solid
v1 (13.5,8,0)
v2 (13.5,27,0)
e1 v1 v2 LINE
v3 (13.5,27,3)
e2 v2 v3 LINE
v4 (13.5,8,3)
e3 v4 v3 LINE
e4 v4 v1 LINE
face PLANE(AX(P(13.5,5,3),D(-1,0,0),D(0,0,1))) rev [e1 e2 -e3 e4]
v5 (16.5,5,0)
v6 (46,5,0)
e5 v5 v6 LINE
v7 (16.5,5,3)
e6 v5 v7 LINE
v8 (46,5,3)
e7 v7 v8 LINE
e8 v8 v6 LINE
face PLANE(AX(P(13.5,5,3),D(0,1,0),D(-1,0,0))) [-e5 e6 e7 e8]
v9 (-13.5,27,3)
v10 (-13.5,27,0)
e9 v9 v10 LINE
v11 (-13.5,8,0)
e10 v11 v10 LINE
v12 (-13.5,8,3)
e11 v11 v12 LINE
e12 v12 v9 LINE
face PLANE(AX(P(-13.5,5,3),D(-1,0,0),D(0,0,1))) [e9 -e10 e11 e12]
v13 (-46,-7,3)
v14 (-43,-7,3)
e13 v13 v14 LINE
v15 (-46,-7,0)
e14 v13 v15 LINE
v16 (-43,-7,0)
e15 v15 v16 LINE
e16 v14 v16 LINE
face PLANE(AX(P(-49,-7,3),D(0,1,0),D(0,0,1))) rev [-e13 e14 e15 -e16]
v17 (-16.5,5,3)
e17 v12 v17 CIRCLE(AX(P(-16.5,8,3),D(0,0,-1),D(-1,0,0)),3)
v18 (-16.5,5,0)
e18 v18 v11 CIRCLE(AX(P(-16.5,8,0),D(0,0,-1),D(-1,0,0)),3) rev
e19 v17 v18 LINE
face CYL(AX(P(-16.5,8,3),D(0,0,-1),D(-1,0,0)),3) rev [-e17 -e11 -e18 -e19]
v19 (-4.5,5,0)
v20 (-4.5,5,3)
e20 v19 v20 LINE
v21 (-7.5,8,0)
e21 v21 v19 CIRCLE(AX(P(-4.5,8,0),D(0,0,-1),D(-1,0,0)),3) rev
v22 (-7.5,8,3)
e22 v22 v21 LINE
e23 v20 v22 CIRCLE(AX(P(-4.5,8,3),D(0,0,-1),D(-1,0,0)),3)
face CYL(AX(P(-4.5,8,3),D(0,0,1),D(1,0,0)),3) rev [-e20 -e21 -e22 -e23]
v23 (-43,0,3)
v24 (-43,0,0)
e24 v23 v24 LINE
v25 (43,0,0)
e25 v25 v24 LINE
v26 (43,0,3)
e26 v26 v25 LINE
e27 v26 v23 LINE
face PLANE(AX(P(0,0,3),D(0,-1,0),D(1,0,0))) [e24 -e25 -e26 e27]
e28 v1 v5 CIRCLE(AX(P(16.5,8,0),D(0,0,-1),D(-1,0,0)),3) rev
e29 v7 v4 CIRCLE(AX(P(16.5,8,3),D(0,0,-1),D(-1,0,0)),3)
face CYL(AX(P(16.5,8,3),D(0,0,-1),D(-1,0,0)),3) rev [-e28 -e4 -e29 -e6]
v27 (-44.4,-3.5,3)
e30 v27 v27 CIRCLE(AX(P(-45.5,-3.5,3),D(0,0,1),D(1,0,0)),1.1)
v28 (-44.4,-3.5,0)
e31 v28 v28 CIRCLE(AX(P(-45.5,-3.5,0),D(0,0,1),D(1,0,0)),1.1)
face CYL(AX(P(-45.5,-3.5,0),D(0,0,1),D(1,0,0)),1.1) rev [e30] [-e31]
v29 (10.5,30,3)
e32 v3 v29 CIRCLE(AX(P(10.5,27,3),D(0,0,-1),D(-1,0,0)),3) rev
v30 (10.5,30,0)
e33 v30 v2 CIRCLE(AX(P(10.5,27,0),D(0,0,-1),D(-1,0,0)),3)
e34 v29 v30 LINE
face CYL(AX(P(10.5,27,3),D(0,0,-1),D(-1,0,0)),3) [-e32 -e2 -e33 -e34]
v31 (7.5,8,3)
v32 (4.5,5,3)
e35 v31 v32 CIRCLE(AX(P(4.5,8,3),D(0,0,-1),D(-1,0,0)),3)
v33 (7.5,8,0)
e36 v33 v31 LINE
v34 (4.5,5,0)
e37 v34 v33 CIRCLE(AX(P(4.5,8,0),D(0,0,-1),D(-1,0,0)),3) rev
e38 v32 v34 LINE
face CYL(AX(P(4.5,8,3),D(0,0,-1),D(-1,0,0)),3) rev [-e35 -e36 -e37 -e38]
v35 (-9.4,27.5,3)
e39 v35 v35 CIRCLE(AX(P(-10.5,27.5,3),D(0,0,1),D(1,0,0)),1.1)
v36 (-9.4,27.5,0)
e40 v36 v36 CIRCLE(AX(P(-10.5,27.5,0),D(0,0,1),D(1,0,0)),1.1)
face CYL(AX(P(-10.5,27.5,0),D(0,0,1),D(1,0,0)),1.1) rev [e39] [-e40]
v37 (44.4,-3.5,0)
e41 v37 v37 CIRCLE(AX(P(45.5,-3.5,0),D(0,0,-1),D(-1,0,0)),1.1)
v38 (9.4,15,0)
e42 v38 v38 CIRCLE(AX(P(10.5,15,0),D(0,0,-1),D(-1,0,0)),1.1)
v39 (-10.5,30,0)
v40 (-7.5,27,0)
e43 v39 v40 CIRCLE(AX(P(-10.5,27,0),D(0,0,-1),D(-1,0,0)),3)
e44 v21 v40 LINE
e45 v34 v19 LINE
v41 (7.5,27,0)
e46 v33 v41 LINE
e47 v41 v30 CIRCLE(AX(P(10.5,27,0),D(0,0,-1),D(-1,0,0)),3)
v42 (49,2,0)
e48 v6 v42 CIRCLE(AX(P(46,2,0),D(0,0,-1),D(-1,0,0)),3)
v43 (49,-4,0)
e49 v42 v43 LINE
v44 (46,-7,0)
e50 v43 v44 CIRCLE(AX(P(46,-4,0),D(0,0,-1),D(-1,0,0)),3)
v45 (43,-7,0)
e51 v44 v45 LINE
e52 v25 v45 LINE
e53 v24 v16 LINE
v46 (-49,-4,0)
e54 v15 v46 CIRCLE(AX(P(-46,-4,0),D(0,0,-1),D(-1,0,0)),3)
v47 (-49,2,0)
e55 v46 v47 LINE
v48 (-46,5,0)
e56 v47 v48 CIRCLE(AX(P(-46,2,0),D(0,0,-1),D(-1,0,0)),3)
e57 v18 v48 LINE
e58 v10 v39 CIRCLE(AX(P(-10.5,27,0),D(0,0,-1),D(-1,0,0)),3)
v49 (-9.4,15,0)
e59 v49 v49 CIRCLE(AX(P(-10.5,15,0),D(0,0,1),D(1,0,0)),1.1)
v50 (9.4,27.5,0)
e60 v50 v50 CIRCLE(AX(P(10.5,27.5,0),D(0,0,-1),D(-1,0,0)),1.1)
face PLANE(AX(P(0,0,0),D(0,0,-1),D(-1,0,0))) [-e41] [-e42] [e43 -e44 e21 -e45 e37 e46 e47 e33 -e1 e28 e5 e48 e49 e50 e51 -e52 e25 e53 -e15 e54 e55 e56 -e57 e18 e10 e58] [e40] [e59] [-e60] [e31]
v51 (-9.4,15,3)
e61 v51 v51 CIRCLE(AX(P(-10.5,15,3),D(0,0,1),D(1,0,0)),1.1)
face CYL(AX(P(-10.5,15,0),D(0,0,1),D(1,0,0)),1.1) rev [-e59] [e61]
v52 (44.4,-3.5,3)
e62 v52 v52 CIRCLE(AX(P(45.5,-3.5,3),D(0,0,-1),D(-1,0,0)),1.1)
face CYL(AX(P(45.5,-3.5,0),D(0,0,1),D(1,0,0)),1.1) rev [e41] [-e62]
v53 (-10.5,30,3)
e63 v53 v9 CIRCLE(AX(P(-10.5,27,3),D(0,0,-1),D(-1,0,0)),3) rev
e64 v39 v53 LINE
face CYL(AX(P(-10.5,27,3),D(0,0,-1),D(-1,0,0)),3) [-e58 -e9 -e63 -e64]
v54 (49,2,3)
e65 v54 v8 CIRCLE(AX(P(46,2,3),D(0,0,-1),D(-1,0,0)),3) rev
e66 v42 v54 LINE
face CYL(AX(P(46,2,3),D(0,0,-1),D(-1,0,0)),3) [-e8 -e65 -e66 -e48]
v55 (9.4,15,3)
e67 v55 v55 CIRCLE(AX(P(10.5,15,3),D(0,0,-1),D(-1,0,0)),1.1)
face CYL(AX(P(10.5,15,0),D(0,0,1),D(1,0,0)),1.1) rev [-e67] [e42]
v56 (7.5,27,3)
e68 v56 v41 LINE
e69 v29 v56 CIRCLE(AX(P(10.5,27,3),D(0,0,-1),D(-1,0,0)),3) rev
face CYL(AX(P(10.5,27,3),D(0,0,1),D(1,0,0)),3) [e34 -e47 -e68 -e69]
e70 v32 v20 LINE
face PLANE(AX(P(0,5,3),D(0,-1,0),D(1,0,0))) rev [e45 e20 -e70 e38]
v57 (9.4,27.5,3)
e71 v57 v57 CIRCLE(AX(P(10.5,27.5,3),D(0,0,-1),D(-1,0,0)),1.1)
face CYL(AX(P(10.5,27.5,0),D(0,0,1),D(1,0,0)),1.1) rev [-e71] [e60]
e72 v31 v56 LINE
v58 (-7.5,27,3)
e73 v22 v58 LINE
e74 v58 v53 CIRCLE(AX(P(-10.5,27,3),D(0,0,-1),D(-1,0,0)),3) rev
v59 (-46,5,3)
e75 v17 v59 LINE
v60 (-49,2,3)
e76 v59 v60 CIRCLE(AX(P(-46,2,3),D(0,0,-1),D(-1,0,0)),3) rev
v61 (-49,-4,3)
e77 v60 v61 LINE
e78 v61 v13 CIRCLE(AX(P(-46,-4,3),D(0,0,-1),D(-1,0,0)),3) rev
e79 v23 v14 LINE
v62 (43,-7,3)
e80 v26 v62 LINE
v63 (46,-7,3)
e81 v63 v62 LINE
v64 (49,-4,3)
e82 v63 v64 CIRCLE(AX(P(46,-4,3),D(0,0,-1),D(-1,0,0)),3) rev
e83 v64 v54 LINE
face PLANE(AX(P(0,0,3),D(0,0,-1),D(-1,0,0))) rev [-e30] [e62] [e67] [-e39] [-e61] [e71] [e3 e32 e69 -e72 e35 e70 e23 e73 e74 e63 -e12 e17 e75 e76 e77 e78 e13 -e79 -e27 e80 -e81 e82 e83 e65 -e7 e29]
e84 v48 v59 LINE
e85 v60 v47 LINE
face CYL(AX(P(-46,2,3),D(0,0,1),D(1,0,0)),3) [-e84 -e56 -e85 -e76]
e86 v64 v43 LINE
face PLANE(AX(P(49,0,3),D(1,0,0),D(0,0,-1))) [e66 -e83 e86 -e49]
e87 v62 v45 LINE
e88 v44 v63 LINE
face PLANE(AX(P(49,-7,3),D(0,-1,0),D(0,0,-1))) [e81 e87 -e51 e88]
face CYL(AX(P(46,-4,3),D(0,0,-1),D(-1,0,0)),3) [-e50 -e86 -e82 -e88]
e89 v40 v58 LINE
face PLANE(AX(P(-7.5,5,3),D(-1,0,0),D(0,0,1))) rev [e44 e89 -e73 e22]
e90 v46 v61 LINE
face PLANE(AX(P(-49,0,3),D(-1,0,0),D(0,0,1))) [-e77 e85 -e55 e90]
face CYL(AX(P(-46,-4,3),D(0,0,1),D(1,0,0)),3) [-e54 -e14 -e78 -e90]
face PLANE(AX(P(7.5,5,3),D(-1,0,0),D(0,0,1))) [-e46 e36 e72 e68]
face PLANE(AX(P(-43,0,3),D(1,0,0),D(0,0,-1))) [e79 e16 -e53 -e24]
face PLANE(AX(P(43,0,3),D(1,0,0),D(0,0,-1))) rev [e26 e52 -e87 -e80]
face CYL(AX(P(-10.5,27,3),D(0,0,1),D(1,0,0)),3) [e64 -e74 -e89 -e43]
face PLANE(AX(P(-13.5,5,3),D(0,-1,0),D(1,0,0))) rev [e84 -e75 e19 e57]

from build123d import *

# Parameters (mm, degrees)
BOSS_EXTRU_1_DEPTH      = 3
ESQUISSE2_R             = 1.1
ENL_V_MAT_EXTRU_1_DEPTH = 3
ESQUISSE3_R             = 1.1
ENL_V_MAT_EXTRU_2_DEPTH = 3
CONG_1_R                = 3
CONG_1_OF_SYM_TRIE1_R   = 3


with BuildPart() as part:
    # Esquisse1 → Boss.-Extru.1 (new body)
    with BuildSketch(Plane.XY):
        Polygon((-13.5, 5), (-49, 5), (-49, 0), (-49, -7), (-43, -7), (-43, 0), (0, 0), (0, 5), (-7.5, 5), (-7.5, 30), (-13.5, 30), align=None)
    boss_extru_1 = extrude(amount=BOSS_EXTRU_1_DEPTH)

    # Esquisse2 → Enlèv. mat.-Extru.1 (cut)
    with BuildSketch(Plane.XY.offset(3)):
        with Locations((-45.5, -3.5)):
            Circle(ESQUISSE2_R)
    enl_v_mat_extru_1 = extrude(amount=-ENL_V_MAT_EXTRU_1_DEPTH, mode=Mode.SUBTRACT)

    # Esquisse3 → Enlèv. mat.-Extru.2 (cut)
    with BuildSketch(Plane.XY.offset(3)):
        with Locations((-10.5, 15)):
            Circle(ESQUISSE3_R)
        with Locations((-10.5, 27.5)):
            Circle(ESQUISSE3_R)
    enl_v_mat_extru_2 = extrude(amount=-ENL_V_MAT_EXTRU_2_DEPTH, mode=Mode.SUBTRACT)

    # Congé1
    cong_1_edges = [part.edges().sort_by_distance(p)[0] for p in [
        (-13.5, 5, 1.5),
        (-7.5, 5, 1.5),
        (-7.5, 30, 1.5),
        (-13.5, 30, 1.5),
        (-49, 5, 1.5),
        (-49, -7, 1.5),
    ]]
    fillet(cong_1_edges, radius=CONG_1_R - 0.0001)  # a hair under: the kernel refuses the full size

    # Symétrie1: Boss.-Extru.1, Enlèv. mat.-Extru.1, Enlèv. mat.-Extru.2 across plane
    add(boss_extru_1.mirror(Plane(origin=(0, 0, 0), x_dir=(0, 0, 1), z_dir=(1, 0, 0))))
    add(enl_v_mat_extru_1.mirror(Plane(origin=(0, 0, 0), x_dir=(0, 0, 1), z_dir=(1, 0, 0))), mode=Mode.SUBTRACT)
    add(enl_v_mat_extru_2.mirror(Plane(origin=(0, 0, 0), x_dir=(0, 0, 1), z_dir=(1, 0, 0))), mode=Mode.SUBTRACT)

    # Congé1 of Symétrie1
    cong_1_of_sym_trie1_edges = [part.edges().sort_by_distance(p)[0] for p in [
        (13.5, 5, 1.5),
        (7.5, 5, 1.5),
        (7.5, 30, 1.5),
        (13.5, 30, 1.5),
        (49, 5, 1.5),
        (49, -7, 1.5),
    ]]
    fillet(cong_1_of_sym_trie1_edges, radius=CONG_1_OF_SYM_TRIE1_R - 0.0001)  # a hair under: the kernel refuses the full size


solid = part.part
